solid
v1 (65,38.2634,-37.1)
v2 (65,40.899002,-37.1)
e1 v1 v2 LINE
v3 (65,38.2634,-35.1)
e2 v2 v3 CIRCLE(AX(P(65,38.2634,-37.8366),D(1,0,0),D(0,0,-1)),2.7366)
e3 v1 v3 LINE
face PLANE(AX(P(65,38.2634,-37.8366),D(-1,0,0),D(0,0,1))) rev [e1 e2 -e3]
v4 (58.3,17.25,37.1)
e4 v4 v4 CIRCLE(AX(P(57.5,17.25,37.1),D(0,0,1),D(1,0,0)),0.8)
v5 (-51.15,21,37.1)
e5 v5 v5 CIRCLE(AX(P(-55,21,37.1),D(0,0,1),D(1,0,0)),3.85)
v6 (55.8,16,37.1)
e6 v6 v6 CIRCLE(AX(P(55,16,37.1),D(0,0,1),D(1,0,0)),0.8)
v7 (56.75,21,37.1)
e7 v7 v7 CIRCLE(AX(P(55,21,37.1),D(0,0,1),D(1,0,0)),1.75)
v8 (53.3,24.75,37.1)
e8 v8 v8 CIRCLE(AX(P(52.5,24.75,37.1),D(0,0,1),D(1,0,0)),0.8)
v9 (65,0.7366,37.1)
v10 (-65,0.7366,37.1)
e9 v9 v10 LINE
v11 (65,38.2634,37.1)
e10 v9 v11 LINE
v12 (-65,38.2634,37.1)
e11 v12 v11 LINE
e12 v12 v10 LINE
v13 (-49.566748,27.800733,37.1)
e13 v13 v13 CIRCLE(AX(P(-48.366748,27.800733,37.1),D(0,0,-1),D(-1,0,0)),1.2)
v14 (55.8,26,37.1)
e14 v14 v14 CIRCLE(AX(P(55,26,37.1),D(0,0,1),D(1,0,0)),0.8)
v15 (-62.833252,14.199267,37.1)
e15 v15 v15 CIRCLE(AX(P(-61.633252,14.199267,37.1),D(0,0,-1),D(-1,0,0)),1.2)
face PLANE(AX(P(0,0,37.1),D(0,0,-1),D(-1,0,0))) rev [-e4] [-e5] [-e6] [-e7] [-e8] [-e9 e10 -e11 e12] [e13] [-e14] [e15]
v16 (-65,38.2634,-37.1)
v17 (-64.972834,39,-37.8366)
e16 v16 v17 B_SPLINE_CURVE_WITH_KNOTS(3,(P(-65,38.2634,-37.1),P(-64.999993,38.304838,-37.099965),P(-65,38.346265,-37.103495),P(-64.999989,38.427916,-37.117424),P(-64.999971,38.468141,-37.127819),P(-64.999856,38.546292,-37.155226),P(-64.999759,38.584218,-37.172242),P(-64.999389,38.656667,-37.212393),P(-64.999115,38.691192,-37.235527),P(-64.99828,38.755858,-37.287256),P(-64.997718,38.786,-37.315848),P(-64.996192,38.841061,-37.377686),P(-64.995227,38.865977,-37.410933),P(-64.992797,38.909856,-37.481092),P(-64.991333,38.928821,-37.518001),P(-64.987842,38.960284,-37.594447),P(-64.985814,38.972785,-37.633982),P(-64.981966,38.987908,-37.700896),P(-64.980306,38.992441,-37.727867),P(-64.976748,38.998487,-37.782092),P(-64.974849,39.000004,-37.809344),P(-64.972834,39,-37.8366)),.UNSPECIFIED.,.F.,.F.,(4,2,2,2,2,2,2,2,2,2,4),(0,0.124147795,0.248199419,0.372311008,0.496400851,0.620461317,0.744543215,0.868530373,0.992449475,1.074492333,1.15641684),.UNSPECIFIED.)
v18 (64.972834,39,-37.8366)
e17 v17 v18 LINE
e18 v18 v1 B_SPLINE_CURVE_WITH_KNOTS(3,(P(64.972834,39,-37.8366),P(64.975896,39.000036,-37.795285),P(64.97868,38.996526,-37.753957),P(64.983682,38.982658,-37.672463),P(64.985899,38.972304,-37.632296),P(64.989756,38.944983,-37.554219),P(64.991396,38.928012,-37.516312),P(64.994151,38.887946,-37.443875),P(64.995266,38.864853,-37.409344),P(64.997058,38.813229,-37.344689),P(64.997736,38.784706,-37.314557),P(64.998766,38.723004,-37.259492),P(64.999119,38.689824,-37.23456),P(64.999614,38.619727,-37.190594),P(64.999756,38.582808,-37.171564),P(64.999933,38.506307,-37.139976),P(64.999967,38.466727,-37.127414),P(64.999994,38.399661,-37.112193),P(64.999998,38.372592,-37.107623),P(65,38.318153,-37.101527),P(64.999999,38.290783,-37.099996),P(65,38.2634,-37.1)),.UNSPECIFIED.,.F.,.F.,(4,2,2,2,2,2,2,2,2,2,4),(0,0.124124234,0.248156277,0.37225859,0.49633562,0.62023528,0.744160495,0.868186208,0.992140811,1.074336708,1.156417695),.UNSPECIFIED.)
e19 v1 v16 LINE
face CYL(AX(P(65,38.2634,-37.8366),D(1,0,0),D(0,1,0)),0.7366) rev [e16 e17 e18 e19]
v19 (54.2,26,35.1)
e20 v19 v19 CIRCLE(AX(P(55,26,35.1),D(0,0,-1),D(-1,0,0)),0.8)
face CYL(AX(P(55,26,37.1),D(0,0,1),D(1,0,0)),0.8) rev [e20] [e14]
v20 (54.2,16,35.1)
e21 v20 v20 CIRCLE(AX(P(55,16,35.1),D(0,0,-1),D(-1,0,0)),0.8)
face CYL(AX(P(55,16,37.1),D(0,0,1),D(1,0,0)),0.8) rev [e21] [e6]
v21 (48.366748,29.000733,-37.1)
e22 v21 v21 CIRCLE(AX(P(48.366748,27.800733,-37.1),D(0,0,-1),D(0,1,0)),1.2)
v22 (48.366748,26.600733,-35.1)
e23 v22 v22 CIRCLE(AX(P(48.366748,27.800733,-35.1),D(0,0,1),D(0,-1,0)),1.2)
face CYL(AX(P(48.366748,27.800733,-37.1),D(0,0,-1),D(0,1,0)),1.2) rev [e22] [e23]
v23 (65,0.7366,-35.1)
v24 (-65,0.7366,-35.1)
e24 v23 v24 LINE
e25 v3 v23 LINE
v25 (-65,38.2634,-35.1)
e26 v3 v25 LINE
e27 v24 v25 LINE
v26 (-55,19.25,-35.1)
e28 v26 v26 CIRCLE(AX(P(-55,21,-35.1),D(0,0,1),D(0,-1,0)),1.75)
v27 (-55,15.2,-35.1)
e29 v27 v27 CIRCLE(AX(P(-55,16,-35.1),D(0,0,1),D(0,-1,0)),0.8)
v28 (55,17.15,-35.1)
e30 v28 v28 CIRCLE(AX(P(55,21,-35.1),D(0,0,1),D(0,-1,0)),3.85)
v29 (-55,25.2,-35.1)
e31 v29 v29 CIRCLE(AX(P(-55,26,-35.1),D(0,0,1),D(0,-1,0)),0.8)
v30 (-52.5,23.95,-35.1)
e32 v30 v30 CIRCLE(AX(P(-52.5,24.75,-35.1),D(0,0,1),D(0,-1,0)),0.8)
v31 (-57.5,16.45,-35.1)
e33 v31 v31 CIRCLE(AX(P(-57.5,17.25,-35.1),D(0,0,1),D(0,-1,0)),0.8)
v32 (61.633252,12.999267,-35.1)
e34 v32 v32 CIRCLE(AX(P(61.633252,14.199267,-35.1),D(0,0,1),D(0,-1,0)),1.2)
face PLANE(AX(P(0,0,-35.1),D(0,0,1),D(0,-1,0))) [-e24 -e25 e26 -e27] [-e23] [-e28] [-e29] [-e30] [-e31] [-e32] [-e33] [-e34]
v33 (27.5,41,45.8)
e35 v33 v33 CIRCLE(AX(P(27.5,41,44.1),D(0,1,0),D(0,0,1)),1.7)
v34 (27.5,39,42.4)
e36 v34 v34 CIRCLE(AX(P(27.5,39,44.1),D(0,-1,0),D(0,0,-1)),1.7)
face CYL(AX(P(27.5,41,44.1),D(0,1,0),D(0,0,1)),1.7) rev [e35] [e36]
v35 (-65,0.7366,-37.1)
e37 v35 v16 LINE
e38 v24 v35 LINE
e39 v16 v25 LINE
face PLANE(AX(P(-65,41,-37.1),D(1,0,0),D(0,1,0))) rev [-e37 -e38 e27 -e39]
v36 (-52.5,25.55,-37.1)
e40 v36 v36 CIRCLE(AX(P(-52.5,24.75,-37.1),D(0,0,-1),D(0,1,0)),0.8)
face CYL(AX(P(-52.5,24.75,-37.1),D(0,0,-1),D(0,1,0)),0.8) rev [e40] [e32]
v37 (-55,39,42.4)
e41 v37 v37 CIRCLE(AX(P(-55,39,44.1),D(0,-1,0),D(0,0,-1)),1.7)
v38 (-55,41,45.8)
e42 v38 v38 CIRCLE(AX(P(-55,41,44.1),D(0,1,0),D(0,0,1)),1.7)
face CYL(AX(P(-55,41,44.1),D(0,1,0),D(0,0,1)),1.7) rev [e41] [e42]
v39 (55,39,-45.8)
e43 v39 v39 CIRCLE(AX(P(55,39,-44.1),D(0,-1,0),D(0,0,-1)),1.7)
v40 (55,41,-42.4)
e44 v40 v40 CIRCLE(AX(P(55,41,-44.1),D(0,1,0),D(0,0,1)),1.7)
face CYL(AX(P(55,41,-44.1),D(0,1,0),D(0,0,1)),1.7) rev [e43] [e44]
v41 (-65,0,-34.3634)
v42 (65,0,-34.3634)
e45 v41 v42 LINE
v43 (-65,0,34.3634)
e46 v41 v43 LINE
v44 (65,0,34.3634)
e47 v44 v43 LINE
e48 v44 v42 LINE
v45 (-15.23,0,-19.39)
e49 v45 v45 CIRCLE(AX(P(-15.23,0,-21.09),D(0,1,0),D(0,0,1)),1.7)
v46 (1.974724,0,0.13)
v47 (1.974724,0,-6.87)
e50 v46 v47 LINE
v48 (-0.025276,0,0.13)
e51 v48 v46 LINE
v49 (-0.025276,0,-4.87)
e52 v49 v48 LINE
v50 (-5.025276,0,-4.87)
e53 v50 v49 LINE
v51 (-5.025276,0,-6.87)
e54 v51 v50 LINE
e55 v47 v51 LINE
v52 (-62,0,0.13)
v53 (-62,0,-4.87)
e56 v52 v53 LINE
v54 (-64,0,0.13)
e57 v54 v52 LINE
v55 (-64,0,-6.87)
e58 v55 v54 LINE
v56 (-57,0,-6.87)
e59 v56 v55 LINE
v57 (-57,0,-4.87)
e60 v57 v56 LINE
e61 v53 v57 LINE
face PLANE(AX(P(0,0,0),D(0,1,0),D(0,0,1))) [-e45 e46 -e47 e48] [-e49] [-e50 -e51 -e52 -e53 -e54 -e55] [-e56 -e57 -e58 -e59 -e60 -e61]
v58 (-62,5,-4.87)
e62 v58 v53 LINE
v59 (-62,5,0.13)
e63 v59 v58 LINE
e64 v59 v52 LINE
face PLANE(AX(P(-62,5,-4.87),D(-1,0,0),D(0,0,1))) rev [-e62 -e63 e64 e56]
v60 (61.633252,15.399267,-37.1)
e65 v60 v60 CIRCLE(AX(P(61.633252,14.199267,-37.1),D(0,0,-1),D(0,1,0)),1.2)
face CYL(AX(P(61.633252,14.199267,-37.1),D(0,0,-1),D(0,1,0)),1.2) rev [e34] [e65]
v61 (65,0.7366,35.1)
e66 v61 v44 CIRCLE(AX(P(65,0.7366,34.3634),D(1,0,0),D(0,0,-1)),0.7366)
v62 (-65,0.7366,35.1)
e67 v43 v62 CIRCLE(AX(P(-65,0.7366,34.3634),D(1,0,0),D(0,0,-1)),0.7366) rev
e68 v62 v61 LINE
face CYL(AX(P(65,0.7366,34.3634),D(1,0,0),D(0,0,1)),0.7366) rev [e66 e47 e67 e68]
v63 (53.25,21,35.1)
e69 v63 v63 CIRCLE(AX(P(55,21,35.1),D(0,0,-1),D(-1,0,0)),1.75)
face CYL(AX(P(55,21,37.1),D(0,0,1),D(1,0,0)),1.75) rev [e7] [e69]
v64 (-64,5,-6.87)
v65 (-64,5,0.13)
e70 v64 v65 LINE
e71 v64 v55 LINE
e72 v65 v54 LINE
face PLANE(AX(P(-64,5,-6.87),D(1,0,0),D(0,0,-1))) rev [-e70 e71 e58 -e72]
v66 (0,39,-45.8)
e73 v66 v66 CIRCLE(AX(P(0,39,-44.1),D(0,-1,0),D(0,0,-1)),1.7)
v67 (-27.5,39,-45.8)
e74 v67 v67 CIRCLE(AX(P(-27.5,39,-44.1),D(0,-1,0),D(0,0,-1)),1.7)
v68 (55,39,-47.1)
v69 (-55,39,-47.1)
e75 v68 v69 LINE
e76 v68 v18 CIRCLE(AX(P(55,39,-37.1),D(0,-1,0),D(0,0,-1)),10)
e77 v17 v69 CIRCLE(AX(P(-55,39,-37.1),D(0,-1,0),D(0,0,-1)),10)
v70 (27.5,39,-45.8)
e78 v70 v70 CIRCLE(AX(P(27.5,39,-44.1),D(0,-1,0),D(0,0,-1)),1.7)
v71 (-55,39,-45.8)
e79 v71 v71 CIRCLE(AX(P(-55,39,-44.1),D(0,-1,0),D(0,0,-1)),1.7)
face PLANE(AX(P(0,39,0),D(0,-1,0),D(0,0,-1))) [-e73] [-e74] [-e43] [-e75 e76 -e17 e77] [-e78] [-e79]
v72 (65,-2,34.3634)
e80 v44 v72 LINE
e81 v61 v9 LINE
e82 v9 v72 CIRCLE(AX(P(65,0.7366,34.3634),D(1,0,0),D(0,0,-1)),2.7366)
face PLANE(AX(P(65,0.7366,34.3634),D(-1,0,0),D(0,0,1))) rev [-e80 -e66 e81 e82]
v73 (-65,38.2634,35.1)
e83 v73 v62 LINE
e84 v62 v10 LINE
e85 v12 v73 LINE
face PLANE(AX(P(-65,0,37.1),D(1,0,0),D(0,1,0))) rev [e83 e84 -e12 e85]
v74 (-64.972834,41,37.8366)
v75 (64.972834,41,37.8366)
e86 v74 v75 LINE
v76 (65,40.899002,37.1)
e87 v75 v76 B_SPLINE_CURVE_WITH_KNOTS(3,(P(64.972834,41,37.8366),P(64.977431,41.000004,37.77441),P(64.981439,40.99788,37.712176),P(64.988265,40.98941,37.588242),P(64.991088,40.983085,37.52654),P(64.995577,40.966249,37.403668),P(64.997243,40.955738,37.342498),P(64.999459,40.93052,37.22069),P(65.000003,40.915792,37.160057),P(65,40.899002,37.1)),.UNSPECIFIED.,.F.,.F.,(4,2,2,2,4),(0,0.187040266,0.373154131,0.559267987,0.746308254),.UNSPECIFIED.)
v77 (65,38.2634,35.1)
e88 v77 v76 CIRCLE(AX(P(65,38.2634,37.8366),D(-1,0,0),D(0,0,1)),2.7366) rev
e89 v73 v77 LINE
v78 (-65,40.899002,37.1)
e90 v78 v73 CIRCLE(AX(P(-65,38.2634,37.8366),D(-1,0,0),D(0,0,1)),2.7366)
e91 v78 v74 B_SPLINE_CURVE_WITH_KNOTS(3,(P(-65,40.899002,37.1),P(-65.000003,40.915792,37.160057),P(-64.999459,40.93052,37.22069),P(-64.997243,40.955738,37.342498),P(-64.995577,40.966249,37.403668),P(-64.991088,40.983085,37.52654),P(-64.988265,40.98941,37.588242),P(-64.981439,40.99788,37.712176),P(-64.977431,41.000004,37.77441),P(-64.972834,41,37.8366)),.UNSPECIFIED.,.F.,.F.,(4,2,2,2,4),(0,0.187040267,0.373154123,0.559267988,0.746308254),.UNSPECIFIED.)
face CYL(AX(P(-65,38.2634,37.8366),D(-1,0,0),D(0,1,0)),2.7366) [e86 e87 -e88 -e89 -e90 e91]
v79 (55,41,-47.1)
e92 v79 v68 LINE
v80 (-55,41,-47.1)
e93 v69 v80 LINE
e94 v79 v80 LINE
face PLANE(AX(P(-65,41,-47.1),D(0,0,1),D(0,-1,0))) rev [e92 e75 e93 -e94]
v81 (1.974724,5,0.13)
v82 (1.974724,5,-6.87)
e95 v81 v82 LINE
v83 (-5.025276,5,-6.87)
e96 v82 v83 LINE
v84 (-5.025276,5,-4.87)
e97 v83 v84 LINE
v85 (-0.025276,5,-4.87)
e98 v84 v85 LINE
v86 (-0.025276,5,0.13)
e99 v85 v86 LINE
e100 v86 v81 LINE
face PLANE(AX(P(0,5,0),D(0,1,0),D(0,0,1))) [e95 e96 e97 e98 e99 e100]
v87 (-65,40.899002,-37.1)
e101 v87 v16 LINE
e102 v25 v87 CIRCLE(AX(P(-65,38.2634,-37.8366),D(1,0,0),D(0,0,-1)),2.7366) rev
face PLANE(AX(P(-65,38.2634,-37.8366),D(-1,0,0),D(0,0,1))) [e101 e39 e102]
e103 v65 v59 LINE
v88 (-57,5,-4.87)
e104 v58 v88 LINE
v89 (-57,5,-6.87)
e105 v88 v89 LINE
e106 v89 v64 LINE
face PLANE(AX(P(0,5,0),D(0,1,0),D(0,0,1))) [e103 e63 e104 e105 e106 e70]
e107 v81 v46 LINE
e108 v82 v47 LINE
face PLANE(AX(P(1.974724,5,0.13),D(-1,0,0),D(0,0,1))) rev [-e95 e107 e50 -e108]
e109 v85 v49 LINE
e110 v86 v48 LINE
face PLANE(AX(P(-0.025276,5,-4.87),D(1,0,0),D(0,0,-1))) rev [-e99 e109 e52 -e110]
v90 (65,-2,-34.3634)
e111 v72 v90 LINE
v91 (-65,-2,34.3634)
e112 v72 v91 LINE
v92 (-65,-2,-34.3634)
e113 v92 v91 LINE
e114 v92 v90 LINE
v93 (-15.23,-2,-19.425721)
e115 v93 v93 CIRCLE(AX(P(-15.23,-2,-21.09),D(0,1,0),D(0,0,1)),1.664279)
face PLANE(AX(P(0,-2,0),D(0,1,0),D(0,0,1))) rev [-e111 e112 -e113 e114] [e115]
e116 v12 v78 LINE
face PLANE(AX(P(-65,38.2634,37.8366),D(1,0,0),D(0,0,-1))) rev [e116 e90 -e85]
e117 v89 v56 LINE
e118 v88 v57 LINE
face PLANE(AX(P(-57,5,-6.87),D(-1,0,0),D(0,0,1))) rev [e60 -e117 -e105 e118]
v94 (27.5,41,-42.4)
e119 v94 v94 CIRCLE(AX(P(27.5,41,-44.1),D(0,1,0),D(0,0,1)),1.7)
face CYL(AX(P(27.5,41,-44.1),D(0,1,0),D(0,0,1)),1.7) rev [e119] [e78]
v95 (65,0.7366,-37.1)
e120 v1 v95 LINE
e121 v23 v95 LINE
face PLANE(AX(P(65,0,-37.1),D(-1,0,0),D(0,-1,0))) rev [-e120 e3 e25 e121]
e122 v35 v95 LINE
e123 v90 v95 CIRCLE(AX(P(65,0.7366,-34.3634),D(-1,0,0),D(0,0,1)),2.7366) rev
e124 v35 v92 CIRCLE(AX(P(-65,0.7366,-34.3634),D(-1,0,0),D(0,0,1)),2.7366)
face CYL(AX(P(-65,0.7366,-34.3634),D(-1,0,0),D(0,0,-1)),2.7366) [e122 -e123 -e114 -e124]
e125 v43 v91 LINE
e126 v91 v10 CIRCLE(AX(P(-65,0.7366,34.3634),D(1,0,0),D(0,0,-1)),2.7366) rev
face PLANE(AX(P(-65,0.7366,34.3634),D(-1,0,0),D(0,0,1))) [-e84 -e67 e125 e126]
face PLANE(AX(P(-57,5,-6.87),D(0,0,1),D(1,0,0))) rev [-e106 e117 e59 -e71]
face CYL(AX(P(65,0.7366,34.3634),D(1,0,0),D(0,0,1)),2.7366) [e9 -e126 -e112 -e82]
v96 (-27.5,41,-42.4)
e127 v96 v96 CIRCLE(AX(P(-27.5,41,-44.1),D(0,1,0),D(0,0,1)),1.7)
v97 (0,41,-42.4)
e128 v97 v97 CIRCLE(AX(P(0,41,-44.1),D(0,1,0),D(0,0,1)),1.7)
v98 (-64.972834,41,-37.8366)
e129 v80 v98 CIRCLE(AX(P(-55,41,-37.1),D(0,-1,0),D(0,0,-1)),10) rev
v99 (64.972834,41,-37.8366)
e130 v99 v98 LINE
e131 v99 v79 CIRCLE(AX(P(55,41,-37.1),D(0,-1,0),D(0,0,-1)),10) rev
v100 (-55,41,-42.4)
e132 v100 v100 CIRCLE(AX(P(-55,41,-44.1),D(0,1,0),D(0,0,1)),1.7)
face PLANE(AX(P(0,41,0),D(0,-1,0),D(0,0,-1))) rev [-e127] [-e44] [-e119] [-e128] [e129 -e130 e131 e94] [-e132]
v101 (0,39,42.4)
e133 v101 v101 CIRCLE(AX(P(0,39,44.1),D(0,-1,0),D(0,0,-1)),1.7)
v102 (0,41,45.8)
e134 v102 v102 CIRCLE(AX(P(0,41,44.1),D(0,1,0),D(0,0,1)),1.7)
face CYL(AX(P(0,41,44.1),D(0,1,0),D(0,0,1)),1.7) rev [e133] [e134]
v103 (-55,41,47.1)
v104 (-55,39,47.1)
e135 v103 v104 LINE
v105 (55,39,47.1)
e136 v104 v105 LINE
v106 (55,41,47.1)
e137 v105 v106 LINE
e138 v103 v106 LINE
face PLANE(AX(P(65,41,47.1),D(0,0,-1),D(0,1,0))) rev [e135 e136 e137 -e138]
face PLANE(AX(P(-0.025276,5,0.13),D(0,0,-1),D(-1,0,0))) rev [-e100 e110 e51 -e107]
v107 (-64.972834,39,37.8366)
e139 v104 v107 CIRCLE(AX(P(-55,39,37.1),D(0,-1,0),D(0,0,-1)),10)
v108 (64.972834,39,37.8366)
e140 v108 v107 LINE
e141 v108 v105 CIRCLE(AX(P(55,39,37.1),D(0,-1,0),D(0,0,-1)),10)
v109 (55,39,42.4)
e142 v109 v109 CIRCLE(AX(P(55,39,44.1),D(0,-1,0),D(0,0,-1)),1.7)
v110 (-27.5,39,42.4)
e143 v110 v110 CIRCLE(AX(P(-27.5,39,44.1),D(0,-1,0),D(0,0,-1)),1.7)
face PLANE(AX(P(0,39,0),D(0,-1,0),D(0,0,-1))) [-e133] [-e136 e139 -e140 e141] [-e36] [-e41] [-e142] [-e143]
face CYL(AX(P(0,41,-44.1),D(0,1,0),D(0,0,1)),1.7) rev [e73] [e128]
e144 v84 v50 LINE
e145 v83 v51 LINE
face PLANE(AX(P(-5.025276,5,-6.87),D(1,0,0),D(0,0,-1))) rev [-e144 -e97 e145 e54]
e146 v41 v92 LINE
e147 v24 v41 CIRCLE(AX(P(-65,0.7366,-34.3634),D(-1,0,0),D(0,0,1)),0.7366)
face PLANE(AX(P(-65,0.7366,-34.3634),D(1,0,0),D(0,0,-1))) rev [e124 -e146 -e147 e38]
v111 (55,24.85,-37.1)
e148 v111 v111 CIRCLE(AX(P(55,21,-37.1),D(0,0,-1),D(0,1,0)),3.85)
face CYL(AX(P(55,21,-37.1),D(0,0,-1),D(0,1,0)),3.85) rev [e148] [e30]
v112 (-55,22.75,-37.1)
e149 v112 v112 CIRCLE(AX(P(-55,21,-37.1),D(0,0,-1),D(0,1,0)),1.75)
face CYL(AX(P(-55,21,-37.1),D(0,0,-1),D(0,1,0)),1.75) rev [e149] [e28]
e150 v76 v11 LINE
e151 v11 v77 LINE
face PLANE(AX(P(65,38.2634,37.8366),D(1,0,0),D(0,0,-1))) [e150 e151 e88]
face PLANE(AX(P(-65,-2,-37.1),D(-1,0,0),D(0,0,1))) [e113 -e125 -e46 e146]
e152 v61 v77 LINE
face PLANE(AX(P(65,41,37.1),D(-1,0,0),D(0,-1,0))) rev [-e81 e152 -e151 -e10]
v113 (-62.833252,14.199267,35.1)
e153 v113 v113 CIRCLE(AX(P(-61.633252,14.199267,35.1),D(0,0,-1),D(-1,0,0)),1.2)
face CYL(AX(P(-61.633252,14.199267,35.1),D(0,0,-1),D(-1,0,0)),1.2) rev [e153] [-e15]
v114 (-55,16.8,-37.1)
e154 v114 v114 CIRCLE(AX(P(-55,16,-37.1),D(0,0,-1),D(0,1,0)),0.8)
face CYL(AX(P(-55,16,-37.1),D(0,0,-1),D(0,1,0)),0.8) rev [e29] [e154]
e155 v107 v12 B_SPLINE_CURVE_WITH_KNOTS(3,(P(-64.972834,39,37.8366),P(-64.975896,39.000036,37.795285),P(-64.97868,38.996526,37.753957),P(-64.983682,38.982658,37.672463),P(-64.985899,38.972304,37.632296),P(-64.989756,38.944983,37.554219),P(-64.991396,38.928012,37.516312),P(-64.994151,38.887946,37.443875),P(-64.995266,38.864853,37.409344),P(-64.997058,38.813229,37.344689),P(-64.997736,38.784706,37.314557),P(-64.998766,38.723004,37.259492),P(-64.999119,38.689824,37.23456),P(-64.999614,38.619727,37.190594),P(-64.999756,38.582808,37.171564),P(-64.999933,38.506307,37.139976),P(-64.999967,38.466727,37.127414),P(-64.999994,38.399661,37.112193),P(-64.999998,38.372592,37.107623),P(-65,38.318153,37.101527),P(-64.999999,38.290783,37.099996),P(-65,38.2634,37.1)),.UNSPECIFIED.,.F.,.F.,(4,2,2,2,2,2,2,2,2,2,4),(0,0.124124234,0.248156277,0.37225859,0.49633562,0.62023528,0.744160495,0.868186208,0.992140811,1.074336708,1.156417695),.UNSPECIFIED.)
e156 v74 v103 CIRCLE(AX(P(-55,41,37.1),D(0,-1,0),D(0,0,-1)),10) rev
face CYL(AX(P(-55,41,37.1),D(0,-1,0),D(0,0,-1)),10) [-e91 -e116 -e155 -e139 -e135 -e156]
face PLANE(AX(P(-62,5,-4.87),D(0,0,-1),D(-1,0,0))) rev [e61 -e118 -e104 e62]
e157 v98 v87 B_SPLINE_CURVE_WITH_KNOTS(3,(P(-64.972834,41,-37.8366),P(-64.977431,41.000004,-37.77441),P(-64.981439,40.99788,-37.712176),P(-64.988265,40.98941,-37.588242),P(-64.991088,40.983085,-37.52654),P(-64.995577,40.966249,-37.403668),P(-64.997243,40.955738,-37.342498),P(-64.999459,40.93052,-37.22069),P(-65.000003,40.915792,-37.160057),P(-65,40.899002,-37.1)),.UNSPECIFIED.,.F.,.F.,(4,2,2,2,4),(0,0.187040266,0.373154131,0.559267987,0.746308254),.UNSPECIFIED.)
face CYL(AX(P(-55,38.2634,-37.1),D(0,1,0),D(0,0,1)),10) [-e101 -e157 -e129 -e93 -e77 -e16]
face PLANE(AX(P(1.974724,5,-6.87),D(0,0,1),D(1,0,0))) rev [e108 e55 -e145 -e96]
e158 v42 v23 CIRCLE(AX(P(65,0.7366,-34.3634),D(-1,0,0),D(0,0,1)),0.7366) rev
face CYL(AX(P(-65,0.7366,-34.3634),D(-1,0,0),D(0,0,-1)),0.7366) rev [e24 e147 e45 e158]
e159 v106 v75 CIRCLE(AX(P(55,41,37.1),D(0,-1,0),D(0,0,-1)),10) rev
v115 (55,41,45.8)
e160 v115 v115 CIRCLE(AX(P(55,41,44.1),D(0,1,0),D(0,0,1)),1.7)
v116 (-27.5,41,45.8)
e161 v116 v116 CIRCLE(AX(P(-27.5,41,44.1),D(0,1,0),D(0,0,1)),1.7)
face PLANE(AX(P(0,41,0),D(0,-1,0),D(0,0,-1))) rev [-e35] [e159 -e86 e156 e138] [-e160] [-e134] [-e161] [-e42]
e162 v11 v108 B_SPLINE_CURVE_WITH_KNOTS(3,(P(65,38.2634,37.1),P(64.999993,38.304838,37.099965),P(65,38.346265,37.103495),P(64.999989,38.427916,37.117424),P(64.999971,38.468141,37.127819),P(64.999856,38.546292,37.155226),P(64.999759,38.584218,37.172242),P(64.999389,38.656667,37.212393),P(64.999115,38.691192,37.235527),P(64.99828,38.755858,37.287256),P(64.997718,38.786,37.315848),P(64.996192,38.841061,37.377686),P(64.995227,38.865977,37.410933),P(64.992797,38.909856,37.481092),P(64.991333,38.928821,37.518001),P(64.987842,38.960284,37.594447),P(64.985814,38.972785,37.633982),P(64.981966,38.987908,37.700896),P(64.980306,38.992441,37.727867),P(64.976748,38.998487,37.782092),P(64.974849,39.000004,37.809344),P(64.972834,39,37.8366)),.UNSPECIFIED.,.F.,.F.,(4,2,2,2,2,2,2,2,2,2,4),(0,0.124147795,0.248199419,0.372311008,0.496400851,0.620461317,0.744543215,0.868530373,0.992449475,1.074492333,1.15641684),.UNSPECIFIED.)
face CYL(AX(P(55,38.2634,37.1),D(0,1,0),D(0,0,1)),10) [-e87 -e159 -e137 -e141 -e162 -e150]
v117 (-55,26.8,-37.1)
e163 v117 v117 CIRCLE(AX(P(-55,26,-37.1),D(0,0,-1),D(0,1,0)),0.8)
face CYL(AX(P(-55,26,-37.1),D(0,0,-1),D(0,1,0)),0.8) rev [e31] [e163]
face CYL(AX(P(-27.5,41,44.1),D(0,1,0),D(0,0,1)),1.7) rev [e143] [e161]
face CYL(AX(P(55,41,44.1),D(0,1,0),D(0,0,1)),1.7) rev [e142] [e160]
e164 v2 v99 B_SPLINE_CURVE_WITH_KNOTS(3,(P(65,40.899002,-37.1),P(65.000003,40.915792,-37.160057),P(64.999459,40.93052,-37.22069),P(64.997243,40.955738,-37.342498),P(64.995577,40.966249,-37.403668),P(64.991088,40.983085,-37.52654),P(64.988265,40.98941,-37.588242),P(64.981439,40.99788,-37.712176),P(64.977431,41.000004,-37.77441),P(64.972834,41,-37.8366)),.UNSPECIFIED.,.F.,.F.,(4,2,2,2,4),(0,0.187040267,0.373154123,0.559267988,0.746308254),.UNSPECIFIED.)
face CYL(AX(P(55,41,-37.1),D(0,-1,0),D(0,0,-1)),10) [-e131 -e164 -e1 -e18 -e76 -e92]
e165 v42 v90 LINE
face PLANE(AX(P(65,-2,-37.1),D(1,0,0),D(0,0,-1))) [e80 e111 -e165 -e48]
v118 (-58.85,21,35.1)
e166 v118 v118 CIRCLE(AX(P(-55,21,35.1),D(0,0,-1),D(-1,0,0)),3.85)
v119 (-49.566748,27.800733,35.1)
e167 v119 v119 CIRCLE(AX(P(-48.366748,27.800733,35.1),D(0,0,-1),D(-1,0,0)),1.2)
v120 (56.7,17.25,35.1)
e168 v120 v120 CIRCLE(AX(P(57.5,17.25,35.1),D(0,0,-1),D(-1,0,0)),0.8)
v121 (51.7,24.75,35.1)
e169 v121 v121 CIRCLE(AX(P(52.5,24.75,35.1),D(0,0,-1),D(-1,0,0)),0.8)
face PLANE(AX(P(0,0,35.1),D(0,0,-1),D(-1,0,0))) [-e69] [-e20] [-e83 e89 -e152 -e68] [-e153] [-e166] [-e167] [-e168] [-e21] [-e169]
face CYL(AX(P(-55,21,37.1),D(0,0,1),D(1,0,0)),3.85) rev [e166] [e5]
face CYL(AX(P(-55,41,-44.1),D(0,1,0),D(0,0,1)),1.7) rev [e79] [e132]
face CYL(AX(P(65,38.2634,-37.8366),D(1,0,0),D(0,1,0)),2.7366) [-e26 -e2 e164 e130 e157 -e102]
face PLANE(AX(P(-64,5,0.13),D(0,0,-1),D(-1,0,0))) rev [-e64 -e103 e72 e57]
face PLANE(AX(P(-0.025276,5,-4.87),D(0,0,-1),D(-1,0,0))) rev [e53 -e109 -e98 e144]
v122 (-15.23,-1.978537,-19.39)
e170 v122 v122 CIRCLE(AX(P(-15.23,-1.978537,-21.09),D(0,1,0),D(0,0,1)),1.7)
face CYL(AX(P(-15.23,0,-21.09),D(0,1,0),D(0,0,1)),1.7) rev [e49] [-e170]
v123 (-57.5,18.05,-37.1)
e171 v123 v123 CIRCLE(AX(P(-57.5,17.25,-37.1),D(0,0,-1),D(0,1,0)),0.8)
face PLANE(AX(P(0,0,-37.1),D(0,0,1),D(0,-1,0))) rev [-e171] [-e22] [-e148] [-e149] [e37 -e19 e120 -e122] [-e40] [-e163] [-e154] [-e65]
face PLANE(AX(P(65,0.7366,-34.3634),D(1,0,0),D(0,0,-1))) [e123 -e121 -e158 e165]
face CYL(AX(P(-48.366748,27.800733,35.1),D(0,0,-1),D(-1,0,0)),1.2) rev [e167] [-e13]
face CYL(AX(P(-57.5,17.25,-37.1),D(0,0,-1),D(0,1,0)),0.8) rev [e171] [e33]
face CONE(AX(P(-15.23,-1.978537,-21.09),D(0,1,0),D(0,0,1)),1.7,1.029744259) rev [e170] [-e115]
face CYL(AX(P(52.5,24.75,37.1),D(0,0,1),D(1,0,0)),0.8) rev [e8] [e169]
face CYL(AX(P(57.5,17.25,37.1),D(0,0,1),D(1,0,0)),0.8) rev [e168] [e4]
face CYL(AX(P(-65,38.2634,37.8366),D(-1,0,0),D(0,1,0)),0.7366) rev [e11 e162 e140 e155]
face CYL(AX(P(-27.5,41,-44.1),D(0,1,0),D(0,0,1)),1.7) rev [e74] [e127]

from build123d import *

# Parameters (mm, degrees)
SKETCH_1_W                         = 130
SKETCH_1_H                         = 74.2
SM_BASE_FLANGE_1_DEPTH             = 2
SM_EDGE_FLANGE_1_STRIP_W           = 9.4732
SM_EDGE_FLANGE_1_STRIP_H           = 2
SM_EDGE_FLANGE_1_STRIP_CUT_DEPTH   = 130
SM_EDGE_FLANGE_1_STRIP_2_W         = 9.4732
SM_EDGE_FLANGE_1_STRIP_2_H         = 2
SM_EDGE_FLANGE_1_STRIP_CUT_2_DEPTH = 130
SM_EDGE_FLANGE_1_DEPTH             = 130
SM_EDGE_FLANGE_1_BEND_DEPTH        = 130
SM_EDGE_FLANGE_2_STRIP_W           = 9.4732
SM_EDGE_FLANGE_2_STRIP_H           = 2
SM_EDGE_FLANGE_2_STRIP_CUT_DEPTH   = 130
SM_EDGE_FLANGE_2_STRIP_2_W         = 9.4732
SM_EDGE_FLANGE_2_STRIP_2_H         = 2
SM_EDGE_FLANGE_2_STRIP_CUT_2_DEPTH = 130
SM_EDGE_FLANGE_2_DEPTH             = 130
SM_EDGE_FLANGE_2_BEND_DEPTH        = 130
HOLE_WIZARD_M1_4_1_D               = 1.6
HOLE_WIZARD_M1_4_1_DEPTH           = 2
HOLE_WIZARD_M1_4_2_D               = 1.6
HOLE_WIZARD_M1_4_2_DEPTH           = 2
HOLE_WIZARD_3_5_3_5_1_D            = 3.5
HOLE_WIZARD_3_5_3_5_1_DEPTH        = 2
HOLE_WIZARD_3_5_3_5_2_D            = 3.5
HOLE_WIZARD_3_5_3_5_2_DEPTH        = 2
HOLE_WIZARD_7_7_7_7_1_D            = 7.7
HOLE_WIZARD_7_7_7_7_1_DEPTH        = 2
HOLE_WIZARD_7_7_7_7_2_D            = 7.7
HOLE_WIZARD_7_7_7_7_2_DEPTH        = 2
HOLE_WIZARD_M3_2_D                 = 3.4
EXTRUDE_1_DEPTH                    = 5
HOLE_WIZARD_M2_4_D                 = 2.4
HOLE_WIZARD_M2_4_DEPTH             = 2
HOLE_WIZARD_M2_5_D                 = 2.4
HOLE_WIZARD_M2_5_DEPTH             = 2
HOLE_WIZARD_M3_3_D                 = 3.4
HOLE_WIZARD_M3_3_DEPTH             = 1.978536948
HOLE_WIZARD_M3_3_TIP               = 1.021463052
FILLET_1_R                         = 10


# Sheet-metal steps are written as plain solids
with BuildPart() as part:
    # Sketch 1 → 基体-法兰1 (new body)
    with BuildSketch(Plane(origin=(0, 0, 0), x_dir=(1, 0, 0), z_dir=(0, 1, 0))):
        Rectangle(SKETCH_1_W, SKETCH_1_H)
    extrude(amount=-SM_BASE_FLANGE_1_DEPTH)

    # 边线-法兰1 strip (across the edge) → 边线-法兰1 strip cut (cut)
    with BuildSketch(Plane(origin=(-65, 0, 37.1), x_dir=(0, 0, -1), z_dir=(1, 0, 0))):
        with Locations((-2, -1)):
            Rectangle(SM_EDGE_FLANGE_1_STRIP_W, SM_EDGE_FLANGE_1_STRIP_H)
    extrude(amount=SM_EDGE_FLANGE_1_STRIP_CUT_DEPTH, mode=Mode.SUBTRACT)

    # 边线-法兰1 strip 2 (across the edge) → 边线-法兰1 strip cut 2 (cut)
    with BuildSketch(Plane(origin=(65, 0, -37.1), x_dir=(0, 0, 1), z_dir=(-1, 0, 0))):
        with Locations((-2, -1)):
            Rectangle(SM_EDGE_FLANGE_1_STRIP_2_W, SM_EDGE_FLANGE_1_STRIP_2_H)
    extrude(amount=SM_EDGE_FLANGE_1_STRIP_CUT_2_DEPTH, mode=Mode.SUBTRACT)

    # 边线-法兰1 section (across the edge) → 边线-法兰1 (add)
    with BuildSketch(Plane(origin=(-65, 0, 37.1), x_dir=(0, 0, -1), z_dir=(1, 0, 0))):
        with BuildLine():
            Line((0, 0.7366), (0, 41))
            Line((0, 41), (2, 41))
            Line((2, 41), (2, 0.7366))
            ThreePointArc((2, 0.7366), (2.215745145, 0.215745145), (2.7366, 0))
            Line((2.7366, 0), (2.7366, -2))
            ThreePointArc((2.7366, -2), (0.801531583, -1.198468417), (0, 0.7366))
        make_face()
    extrude(amount=SM_EDGE_FLANGE_1_DEPTH)

    # 边线-法兰1 section 2 (across the edge) → 边线-法兰1 bend (add)
    with BuildSketch(Plane(origin=(65, 0, -37.1), x_dir=(0, 0, 1), z_dir=(-1, 0, 0))):
        with BuildLine():
            Line((0, 0.7366), (0, 41))
            Line((0, 41), (2, 41))
            Line((2, 41), (2, 0.7366))
            ThreePointArc((2, 0.7366), (2.215745145, 0.215745145), (2.7366, 0))
            Line((2.7366, 0), (2.7366, -2))
            ThreePointArc((2.7366, -2), (0.801531583, -1.198468417), (0, 0.7366))
        make_face()
    extrude(amount=SM_EDGE_FLANGE_1_BEND_DEPTH)

    # 边线-法兰2 strip (across the edge) → 边线-法兰2 strip cut (cut)
    with BuildSketch(Plane(origin=(65, 41, 37.1), x_dir=(0, -1, 0), z_dir=(-1, 0, 0))):
        with Locations((-2, -1)):
            Rectangle(SM_EDGE_FLANGE_2_STRIP_W, SM_EDGE_FLANGE_2_STRIP_H)
    extrude(amount=SM_EDGE_FLANGE_2_STRIP_CUT_DEPTH, mode=Mode.SUBTRACT)

    # 边线-法兰2 strip 2 (across the edge) → 边线-法兰2 strip cut 2 (cut)
    with BuildSketch(Plane(origin=(-65, 41, -37.1), x_dir=(0, -1, 0), z_dir=(1, 0, 0))):
        with Locations((-2, -1)):
            Rectangle(SM_EDGE_FLANGE_2_STRIP_2_W, SM_EDGE_FLANGE_2_STRIP_2_H)
    extrude(amount=SM_EDGE_FLANGE_2_STRIP_CUT_2_DEPTH, mode=Mode.SUBTRACT)

    # 边线-法兰2 section (across the edge) → 边线-法兰2 (add)
    with BuildSketch(Plane(origin=(65, 41, 37.1), x_dir=(0, -1, 0), z_dir=(-1, 0, 0))):
        with BuildLine():
            Line((0, 0.7366), (0, 10))
            Line((0, 10), (2, 10))
            Line((2, 10), (2, 0.7366))
            ThreePointArc((2, 0.7366), (2.215745145, 0.215745145), (2.7366, 0))
            Line((2.7366, 0), (2.7366, -2))
            ThreePointArc((2.7366, -2), (0.801531583, -1.198468417), (0, 0.7366))
        make_face()
    extrude(amount=SM_EDGE_FLANGE_2_DEPTH)

    # 边线-法兰2 section 2 (across the edge) → 边线-法兰2 bend (add)
    with BuildSketch(Plane(origin=(-65, 41, -37.1), x_dir=(0, -1, 0), z_dir=(1, 0, 0))):
        with BuildLine():
            Line((0, 0.7366), (0, 10))
            Line((0, 10), (2, 10))
            Line((2, 10), (2, 0.7366))
            ThreePointArc((2, 0.7366), (2.215745145, 0.215745145), (2.7366, 0))
            Line((2.7366, 0), (2.7366, -2))
            ThreePointArc((2.7366, -2), (0.801531583, -1.198468417), (0, 0.7366))
        make_face()
    extrude(amount=SM_EDGE_FLANGE_2_BEND_DEPTH)

    # M1.4 间隙孔1
    with Locations(Plane(origin=(0, 0, -37.1), x_dir=(-1, 0, 0), z_dir=(0, 0, -1))):
        with Locations((52.5, 24.75), (55, 26), (57.5, 17.25), (55, 16)):
            Hole(HOLE_WIZARD_M1_4_1_D / 2, depth=HOLE_WIZARD_M1_4_1_DEPTH)

    # M1.4 间隙孔2
    with Locations(Plane.XY.offset(37.1)):
        with Locations((52.5, 24.75), (55, 26), (57.5, 17.25), (55, 16)):
            Hole(HOLE_WIZARD_M1_4_2_D / 2, depth=HOLE_WIZARD_M1_4_2_DEPTH)

    # Ø3.5 (3.5) 直径孔1
    with Locations(Plane(origin=(0, 0, -37.1), x_dir=(-1, 0, 0), z_dir=(0, 0, -1))):
        with Locations((55, 21)):
            Hole(HOLE_WIZARD_3_5_3_5_1_D / 2, depth=HOLE_WIZARD_3_5_3_5_1_DEPTH)

    # Ø3.5 (3.5) 直径孔2
    with Locations(Plane.XY.offset(37.1)):
        with Locations((55, 21)):
            Hole(HOLE_WIZARD_3_5_3_5_2_D / 2, depth=HOLE_WIZARD_3_5_3_5_2_DEPTH)

    # Ø7.7 (7.7) 直径孔1
    with Locations(Plane(origin=(0, 0, -37.1), x_dir=(-1, 0, 0), z_dir=(0, 0, -1))):
        with Locations((-55, 21)):
            Hole(HOLE_WIZARD_7_7_7_7_1_D / 2, depth=HOLE_WIZARD_7_7_7_7_1_DEPTH)

    # Ø7.7 (7.7) 直径孔2
    with Locations(Plane.XY.offset(37.1)):
        with Locations((-55, 21)):
            Hole(HOLE_WIZARD_7_7_7_7_2_D / 2, depth=HOLE_WIZARD_7_7_7_7_2_DEPTH)

    # M3 间隙孔2 (through all)
    with Locations(Plane(origin=(0, 41, 0), x_dir=(1, 0, 0), z_dir=(0, 1, 0))):
        with Locations((-55, 44.1), (-27.5, 44.1), (27.5, 44.1), (55, 44.1), (55, -44.1), (27.5, -44.1), (0, -44.1), (-27.5, -44.1), (-55, -44.1), (0, 44.1)):
            Hole(HOLE_WIZARD_M3_2_D / 2)

    # 草图46 → 凸台-拉伸1 (add)
    with BuildSketch(Plane(origin=(0, 0, 0), x_dir=(1, 0, 0), z_dir=(0, 1, 0))):
        Polygon((1.974724409, 6.87), (-5.025275591, 6.87), (-5.025275591, 4.87), (-0.025275591, 4.87), (-0.025275591, -0.13), (1.974724409, -0.13), align=None)
        Polygon((-64, 6.87), (-64, -0.13), (-62, -0.13), (-62, 4.87), (-57, 4.87), (-57, 6.87), align=None)
    extrude(amount=EXTRUDE_1_DEPTH)

    # M2 间隙孔4
    with Locations(Plane(origin=(0, 0, -37.1), x_dir=(-1, 0, 0), z_dir=(0, 0, -1))):
        with Locations((-48.366748111, 27.800733003), (-61.633251889, 14.199266997)):
            Hole(HOLE_WIZARD_M2_4_D / 2, depth=HOLE_WIZARD_M2_4_DEPTH)

    # M2 间隙孔5
    with Locations(Plane(origin=(0, 0, 35.1), x_dir=(-1, 0, 0), z_dir=(0, 0, -1))):
        with Locations((48.366748111, 27.800733003), (61.633251889, 14.199266997)):
            Hole(HOLE_WIZARD_M2_5_D / 2, depth=HOLE_WIZARD_M2_5_DEPTH)

    # M3 间隙孔3
    with Locations(Plane(origin=(0, 0, 0), x_dir=(1, 0, 0), z_dir=(0, 1, 0))):
        with Locations((-15.23, 21.09)):
            Hole(HOLE_WIZARD_M3_3_D / 2, depth=HOLE_WIZARD_M3_3_DEPTH)
            with Locations((0, 0, -(HOLE_WIZARD_M3_3_DEPTH + HOLE_WIZARD_M3_3_TIP / 2))):  # 118° drill point
                Cone(0, HOLE_WIZARD_M3_3_D / 2, HOLE_WIZARD_M3_3_TIP, mode=Mode.SUBTRACT)

    # 圆角1
    fillet_1_edges = [part.edges().sort_by_distance(p)[0] for p in [
        (65, 40, -47.1),
        (65, 40, 47.1),
        (-65, 40, 47.1),
        (-65, 40, -47.1),
    ]]
    fillet(fillet_1_edges, radius=FILLET_1_R - 0.0001)  # a hair under: the kernel refuses the full size


solid = part.part
